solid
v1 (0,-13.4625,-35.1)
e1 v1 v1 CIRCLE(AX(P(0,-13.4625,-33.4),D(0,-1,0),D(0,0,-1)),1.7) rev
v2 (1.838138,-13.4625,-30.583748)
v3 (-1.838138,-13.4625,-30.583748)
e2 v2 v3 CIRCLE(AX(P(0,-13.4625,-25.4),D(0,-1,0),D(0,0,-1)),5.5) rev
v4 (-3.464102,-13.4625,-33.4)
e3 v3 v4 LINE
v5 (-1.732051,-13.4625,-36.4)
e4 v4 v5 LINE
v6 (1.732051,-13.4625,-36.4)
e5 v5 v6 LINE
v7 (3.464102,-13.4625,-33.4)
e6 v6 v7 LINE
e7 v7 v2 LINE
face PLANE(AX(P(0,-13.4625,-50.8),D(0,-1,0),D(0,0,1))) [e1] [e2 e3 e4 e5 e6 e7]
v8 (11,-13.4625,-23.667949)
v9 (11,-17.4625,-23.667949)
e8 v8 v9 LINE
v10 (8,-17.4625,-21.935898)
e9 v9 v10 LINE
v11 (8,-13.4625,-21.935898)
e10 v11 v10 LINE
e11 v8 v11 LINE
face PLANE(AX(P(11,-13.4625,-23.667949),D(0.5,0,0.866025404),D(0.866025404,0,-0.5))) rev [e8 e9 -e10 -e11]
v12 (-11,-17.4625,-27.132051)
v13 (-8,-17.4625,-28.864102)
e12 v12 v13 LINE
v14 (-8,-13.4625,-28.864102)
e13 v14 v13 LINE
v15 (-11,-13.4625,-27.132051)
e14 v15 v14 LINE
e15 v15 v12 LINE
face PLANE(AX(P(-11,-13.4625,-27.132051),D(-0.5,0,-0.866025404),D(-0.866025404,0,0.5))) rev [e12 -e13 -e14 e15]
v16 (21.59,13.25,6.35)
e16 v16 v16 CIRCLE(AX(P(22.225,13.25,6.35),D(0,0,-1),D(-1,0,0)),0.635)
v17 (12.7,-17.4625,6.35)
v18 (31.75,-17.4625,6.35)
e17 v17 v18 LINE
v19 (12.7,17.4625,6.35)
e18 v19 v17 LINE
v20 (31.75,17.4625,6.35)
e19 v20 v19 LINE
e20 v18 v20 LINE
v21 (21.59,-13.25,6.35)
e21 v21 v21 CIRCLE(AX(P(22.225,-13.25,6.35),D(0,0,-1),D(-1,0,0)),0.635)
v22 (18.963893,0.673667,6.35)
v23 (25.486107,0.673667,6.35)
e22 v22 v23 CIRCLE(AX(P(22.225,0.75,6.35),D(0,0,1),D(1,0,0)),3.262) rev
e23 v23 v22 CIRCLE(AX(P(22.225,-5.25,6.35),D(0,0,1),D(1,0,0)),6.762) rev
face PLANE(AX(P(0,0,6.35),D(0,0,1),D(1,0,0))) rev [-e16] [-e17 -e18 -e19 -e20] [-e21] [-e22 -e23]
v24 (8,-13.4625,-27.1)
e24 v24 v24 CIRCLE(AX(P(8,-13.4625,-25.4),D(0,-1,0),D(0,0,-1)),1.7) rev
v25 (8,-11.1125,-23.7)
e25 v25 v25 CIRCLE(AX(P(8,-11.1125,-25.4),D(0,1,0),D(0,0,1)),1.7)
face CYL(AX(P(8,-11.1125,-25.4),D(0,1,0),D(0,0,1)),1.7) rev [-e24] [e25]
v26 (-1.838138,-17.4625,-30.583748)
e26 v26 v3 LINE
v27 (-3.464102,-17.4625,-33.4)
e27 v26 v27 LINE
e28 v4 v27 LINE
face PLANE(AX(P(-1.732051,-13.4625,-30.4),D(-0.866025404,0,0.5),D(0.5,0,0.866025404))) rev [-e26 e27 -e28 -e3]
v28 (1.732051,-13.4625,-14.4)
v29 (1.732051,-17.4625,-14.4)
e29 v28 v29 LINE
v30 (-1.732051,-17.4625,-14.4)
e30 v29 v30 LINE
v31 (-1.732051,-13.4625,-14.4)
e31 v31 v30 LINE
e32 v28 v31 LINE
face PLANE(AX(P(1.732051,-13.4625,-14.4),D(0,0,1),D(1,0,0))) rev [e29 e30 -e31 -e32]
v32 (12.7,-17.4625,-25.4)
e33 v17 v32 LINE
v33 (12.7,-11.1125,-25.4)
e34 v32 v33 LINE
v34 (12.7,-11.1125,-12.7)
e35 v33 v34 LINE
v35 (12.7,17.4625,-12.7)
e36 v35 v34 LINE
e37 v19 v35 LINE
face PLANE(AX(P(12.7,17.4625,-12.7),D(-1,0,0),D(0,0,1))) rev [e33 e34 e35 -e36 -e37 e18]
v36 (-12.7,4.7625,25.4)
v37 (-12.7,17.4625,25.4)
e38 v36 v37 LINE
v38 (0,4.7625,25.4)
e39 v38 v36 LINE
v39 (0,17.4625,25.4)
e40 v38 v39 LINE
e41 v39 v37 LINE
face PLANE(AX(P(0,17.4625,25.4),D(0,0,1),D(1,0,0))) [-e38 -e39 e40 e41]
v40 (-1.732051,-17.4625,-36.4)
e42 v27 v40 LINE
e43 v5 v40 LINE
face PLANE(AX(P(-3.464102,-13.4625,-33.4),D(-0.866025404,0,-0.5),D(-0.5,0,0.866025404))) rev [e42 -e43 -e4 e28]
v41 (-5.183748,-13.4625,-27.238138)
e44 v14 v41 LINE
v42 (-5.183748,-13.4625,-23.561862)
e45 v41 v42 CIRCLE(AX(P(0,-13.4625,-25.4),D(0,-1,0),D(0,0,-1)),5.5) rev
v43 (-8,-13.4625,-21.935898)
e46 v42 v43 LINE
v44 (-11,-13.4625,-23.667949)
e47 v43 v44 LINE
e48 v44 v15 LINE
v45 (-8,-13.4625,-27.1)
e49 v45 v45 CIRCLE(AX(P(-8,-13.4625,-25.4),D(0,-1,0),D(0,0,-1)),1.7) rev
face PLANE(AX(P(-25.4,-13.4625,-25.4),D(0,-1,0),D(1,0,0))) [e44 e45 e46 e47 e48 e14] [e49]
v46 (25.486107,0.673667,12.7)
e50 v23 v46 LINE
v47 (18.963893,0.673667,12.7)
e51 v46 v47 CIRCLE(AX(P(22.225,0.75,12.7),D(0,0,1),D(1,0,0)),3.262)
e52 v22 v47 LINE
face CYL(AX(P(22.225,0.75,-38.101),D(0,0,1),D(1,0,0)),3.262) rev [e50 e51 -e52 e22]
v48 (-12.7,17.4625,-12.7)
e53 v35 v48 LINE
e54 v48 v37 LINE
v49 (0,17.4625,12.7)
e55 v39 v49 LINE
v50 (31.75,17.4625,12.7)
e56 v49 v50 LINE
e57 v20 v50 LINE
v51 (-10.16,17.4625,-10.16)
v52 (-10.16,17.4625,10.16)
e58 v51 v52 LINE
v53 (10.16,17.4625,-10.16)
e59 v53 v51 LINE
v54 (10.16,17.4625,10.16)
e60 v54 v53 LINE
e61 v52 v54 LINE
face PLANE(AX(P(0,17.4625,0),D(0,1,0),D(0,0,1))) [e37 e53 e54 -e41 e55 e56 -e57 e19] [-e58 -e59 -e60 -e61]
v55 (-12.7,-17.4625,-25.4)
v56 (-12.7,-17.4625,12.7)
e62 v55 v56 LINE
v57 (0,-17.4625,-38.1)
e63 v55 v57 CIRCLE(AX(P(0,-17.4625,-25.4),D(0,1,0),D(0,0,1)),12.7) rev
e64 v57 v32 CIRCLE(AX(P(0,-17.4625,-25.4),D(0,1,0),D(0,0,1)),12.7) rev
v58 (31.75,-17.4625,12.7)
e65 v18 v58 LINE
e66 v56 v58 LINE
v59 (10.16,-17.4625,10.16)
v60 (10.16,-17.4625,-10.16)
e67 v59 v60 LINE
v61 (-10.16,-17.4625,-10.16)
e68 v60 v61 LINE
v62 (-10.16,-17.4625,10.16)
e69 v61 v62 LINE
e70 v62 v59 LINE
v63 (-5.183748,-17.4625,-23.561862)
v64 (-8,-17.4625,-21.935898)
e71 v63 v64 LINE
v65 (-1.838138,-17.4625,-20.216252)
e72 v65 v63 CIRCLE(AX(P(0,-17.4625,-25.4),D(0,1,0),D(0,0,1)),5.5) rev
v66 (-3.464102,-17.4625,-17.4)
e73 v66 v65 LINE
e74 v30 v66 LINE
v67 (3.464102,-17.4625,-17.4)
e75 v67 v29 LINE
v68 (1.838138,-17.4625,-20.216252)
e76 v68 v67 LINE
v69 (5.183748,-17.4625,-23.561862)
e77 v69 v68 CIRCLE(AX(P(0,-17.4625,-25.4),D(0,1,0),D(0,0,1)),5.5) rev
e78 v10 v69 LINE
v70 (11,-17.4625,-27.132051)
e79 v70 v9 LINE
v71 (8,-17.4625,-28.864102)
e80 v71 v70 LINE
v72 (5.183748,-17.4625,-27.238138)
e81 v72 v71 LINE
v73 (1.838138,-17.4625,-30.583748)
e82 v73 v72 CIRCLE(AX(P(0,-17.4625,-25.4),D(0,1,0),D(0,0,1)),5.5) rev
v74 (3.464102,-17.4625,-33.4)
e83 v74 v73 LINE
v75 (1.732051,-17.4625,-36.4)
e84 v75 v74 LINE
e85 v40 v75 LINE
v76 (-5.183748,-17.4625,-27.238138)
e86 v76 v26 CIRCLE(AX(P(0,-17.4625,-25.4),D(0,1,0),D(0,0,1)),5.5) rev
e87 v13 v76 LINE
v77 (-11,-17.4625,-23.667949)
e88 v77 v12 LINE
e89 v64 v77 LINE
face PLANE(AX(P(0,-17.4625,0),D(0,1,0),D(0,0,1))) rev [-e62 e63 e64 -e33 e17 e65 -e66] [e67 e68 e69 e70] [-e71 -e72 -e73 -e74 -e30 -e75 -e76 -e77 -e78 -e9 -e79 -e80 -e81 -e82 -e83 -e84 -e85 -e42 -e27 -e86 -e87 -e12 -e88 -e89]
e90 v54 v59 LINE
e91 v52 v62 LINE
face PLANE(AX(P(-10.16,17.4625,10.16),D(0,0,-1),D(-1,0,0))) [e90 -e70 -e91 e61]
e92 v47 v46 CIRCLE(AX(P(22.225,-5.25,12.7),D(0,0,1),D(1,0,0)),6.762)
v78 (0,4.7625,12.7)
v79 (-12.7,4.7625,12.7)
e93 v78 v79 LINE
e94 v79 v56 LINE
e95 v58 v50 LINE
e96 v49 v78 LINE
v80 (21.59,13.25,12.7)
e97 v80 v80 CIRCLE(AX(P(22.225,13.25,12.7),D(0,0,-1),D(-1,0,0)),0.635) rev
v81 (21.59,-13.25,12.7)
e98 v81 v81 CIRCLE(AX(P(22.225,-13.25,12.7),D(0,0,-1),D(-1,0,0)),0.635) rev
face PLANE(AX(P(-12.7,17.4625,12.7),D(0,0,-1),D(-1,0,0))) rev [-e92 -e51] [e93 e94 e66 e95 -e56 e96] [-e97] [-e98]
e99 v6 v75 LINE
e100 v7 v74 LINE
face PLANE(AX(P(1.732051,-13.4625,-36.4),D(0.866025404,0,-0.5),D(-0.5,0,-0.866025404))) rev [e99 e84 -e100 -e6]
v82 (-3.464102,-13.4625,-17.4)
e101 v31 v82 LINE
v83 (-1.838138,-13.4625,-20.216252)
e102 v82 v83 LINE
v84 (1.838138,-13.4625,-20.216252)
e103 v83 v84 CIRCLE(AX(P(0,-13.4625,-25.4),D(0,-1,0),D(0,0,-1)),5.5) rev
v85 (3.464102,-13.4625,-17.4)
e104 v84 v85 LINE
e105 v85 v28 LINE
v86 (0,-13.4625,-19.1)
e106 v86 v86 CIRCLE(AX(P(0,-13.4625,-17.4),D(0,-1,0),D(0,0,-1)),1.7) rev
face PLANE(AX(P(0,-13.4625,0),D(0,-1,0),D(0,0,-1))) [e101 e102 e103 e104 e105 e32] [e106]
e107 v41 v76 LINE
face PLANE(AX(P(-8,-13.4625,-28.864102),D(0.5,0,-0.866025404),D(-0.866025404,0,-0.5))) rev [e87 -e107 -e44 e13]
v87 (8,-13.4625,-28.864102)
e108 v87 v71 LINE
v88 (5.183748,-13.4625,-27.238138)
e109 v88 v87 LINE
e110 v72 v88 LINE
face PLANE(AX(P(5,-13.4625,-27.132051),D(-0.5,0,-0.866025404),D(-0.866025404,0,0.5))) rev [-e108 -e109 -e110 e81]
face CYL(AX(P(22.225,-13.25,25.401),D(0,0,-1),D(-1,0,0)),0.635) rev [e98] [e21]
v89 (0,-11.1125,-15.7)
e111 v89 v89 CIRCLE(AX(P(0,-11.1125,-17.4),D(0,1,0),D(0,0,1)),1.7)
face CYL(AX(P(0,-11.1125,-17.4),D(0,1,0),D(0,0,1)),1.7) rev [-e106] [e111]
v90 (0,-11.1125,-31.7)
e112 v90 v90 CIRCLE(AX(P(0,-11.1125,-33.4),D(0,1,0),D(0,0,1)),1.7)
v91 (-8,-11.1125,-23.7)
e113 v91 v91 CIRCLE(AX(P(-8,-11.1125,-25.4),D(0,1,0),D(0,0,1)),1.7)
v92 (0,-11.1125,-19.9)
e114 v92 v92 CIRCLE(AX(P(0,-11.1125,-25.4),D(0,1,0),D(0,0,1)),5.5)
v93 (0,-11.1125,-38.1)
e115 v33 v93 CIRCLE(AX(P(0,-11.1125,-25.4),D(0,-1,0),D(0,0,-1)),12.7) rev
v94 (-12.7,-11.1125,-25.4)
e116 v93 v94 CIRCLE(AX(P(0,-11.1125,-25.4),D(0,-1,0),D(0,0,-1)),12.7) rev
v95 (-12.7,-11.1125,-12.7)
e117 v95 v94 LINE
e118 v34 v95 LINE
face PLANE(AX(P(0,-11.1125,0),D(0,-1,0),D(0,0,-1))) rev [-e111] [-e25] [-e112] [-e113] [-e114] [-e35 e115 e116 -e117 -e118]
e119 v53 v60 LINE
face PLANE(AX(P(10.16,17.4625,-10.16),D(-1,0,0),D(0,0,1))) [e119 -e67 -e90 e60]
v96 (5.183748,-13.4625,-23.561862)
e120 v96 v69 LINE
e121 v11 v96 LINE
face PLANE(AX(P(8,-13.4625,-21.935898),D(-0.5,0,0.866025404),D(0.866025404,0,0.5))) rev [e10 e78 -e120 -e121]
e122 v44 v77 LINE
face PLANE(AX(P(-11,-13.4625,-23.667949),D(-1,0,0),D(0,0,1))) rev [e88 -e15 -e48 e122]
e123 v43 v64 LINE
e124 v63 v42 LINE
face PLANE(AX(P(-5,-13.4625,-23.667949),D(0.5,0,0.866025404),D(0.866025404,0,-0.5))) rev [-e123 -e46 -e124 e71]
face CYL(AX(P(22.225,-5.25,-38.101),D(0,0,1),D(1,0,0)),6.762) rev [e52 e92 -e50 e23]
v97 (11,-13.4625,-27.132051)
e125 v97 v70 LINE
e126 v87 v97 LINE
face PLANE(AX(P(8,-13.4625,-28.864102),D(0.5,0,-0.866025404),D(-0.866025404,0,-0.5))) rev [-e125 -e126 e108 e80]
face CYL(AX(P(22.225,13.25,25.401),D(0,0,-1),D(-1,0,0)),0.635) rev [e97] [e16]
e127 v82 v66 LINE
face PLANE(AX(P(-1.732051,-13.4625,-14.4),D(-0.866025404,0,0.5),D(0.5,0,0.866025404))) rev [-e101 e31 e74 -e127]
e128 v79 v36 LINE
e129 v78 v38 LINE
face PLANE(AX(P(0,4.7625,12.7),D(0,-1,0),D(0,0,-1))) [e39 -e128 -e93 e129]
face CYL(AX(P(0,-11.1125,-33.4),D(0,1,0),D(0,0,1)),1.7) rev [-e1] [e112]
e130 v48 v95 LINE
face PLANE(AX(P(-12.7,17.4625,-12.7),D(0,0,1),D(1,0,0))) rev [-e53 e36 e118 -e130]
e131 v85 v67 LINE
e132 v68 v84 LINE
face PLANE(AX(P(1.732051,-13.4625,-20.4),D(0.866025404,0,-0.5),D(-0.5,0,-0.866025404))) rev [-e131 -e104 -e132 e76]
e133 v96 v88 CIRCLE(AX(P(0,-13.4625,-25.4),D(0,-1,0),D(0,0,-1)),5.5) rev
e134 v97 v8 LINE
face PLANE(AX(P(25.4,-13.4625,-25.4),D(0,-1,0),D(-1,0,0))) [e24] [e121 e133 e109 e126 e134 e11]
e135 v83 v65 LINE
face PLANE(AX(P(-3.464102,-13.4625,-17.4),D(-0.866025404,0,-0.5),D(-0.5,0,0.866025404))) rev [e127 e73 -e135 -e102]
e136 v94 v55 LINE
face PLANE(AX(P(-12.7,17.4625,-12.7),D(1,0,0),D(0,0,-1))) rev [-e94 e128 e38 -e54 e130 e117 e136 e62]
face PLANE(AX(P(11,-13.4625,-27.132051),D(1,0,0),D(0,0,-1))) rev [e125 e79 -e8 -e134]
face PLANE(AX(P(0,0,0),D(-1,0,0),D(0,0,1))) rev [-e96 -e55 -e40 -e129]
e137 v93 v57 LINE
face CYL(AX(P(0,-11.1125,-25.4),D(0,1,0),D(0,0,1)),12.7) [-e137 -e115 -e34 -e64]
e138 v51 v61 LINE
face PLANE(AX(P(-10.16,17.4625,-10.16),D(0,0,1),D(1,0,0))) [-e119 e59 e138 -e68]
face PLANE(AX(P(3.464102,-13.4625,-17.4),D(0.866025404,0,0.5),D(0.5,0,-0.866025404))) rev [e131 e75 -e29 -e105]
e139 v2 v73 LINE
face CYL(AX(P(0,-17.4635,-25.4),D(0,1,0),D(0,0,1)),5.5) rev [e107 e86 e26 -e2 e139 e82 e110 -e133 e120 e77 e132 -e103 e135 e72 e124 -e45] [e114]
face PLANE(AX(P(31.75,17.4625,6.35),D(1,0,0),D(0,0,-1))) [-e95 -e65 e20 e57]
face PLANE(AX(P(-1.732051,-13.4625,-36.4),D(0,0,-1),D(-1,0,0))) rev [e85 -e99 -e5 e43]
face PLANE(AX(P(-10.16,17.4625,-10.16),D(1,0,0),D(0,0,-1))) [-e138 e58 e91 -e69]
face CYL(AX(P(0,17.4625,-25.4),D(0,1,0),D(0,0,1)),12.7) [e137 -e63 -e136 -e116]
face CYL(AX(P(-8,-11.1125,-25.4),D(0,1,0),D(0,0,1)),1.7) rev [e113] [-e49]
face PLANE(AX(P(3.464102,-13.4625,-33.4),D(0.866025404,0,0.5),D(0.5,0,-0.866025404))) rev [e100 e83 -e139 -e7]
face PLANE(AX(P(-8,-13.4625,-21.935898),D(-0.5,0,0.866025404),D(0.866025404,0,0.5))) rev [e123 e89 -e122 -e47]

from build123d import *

# Parameters (mm, degrees)
SKETCH1_W            = 25.4
SKETCH1_H            = 25.4
SKETCH1_W_2          = 20.32
SKETCH1_H_2          = 20.32
BOSS_EXTRUDE1_DEPTH  = 17.4625
SKETCH4_W            = 25.4
SKETCH4_H            = 25.4
BOSS_EXTRUDE2_DEPTH  = 6.35
CUT_EXTRUDE1_REACH   = 51.289
SKETCH6_R            = 5.5
FILLET1_R            = 12.7
M3_CLEARANCE_HOLE1_D = 3.4
CIRPATTERN1_COUNT    = 4
CUT_EXTRUDE2_DEPTH   = 4
CIRPATTERN2_COUNT    = 4
SKETCH12_W           = 19.05
SKETCH12_H           = 34.925
BOSS_EXTRUDE3_DEPTH  = 6.35
SKETCH13_W           = 12.7
SKETCH13_H           = 12.7
BOSS_EXTRUDE4_DEPTH  = 12.7
CUT_EXTRUDE3_REACH   = 59.348
SKETCH15_R           = 0.635
CUT_EXTRUDE4_REACH   = 64.399


with BuildPart() as part:
    # Sketch1 → Boss-Extrude1 (new, symmetric)
    with BuildSketch(Plane(origin=(0, 0, 0), x_dir=(1, 0, 0), z_dir=(0, 1, 0))):
        Rectangle(SKETCH1_W, SKETCH1_H)
        Rectangle(SKETCH1_W_2, SKETCH1_H_2, mode=Mode.SUBTRACT)
    extrude(amount=BOSS_EXTRUDE1_DEPTH, both=True)

    # Sketch4 → Boss-Extrude2 (add)
    with BuildSketch(Plane.XZ.offset(17.4625)):
        with Locations((0, -25.4)):
            Rectangle(SKETCH4_W, SKETCH4_H)
    extrude(amount=-BOSS_EXTRUDE2_DEPTH)

    # Sketch6 → Cut-Extrude1 (cut, up to next)
    with BuildSketch(Plane(origin=(0, -11.1125, 0), x_dir=(1, 0, 0), z_dir=(0, 1, 0)), mode=Mode.PRIVATE) as cut_extrude1_sk1:
        with Locations(Location((0, 25.4, 0), (0, 0, 270))):
            Circle(SKETCH6_R)
    cut_extrude1_tool1 = extrude(cut_extrude1_sk1.sketch, amount=-CUT_EXTRUDE1_REACH, mode=Mode.PRIVATE) & part.part
    add(cut_extrude1_tool1.solids().sort_by_distance((0, -11.1125, -25.4))[0], mode=Mode.SUBTRACT)

    # Fillet1
    fillet1_edges = [part.edges().sort_by_distance(p)[0] for p in [
        (-12.7, -14.2875, -38.1),
        (12.7, -14.2875, -38.1),
    ]]
    fillet(fillet1_edges, radius=FILLET1_R - 0.0001)  # a hair under: the kernel refuses the full size

    # M3 Clearance Hole1 (through all)
    with Locations(Plane(origin=(0, -11.1125, 0), x_dir=(1, 0, 0), z_dir=(0, 1, 0))):
        with Locations((0, 33.4)):
            m3_clearance_hole1 = Hole(M3_CLEARANCE_HOLE1_D / 2)

    # CirPattern1: M3 Clearance Hole1 ×4 about axis
    cirpattern1_axis = Axis((0, 0, -25.4), (0, 1, 0))
    for i in range(1, CIRPATTERN1_COUNT):
        add(m3_clearance_hole1.rotate(cirpattern1_axis, i * 360 / CIRPATTERN1_COUNT), mode=Mode.SUBTRACT)

    # Sketch11 → Cut-Extrude2 (cut)
    with BuildSketch(Plane.XZ.offset(17.4625)):
        Polygon((1.732050808, -14.4), (-1.732050808, -14.4), (-3.464101615, -17.4), (-1.732050808, -20.4), (1.732050808, -20.4), (3.464101615, -17.4), align=None)
    cut_extrude2 = extrude(amount=-CUT_EXTRUDE2_DEPTH, mode=Mode.SUBTRACT)

    # CirPattern2: Cut-Extrude2 ×4 about axis
    cirpattern2_axis = Axis((0, 0, -25.4), (0, 1, 0))
    for i in range(1, CIRPATTERN2_COUNT):
        add(cut_extrude2.rotate(cirpattern2_axis, i * 360 / CIRPATTERN2_COUNT), mode=Mode.SUBTRACT)

    # Sketch12 → Boss-Extrude3 (add)
    with BuildSketch(Plane.XY.offset(12.7)):
        with Locations((22.225, 0)):
            Rectangle(SKETCH12_W, SKETCH12_H)
    extrude(amount=-BOSS_EXTRUDE3_DEPTH)

    # Sketch13 → Boss-Extrude4 (add)
    with BuildSketch(Plane.ZY.offset(12.7)):
        with Locations((19.05, 11.1125)):
            Rectangle(SKETCH13_W, SKETCH13_H)
    extrude(amount=-BOSS_EXTRUDE4_DEPTH)

    # Sketch15 → Cut-Extrude3 (cut, up to next)
    with BuildSketch(Plane(origin=(0, 0, 6.35), x_dir=(-1, 0, 0), z_dir=(0, 0, -1)), mode=Mode.PRIVATE) as cut_extrude3_sk1:
        with Locations((-22.225, 13.25)):
            Circle(SKETCH15_R)
    cut_extrude3_tool1 = extrude(cut_extrude3_sk1.sketch, amount=-CUT_EXTRUDE3_REACH, mode=Mode.PRIVATE) & part.part
    # Sketch15 → Cut-Extrude3 (cut, up to next)
    with BuildSketch(Plane(origin=(0, 0, 6.35), x_dir=(-1, 0, 0), z_dir=(0, 0, -1)), mode=Mode.PRIVATE) as cut_extrude3_sk2:
        with Locations((-22.225, -13.25)):
            Circle(SKETCH15_R)
    cut_extrude3_tool2 = extrude(cut_extrude3_sk2.sketch, amount=-CUT_EXTRUDE3_REACH, mode=Mode.PRIVATE) & part.part
    add(cut_extrude3_tool1.solids().sort_by_distance((22.225, 13.25, 6.35))[0], mode=Mode.SUBTRACT)
    add(cut_extrude3_tool2.solids().sort_by_distance((22.225, -13.25, 6.35))[0], mode=Mode.SUBTRACT)

    # Sketch16 → Cut-Extrude4 (cut, up to next)
    with BuildSketch(Plane.XY.offset(12.7), mode=Mode.PRIVATE) as cut_extrude4_sk1:
        with BuildLine():
            ThreePointArc((18.963893252, 0.673666667), (22.225, -12.012), (25.486106748, 0.673666667))
            ThreePointArc((25.486106748, 0.673666667), (22.225, 4.012), (18.963893252, 0.673666667))
        make_face()
    cut_extrude4_tool1 = extrude(cut_extrude4_sk1.sketch, amount=-CUT_EXTRUDE4_REACH, mode=Mode.PRIVATE) & part.part
    add(cut_extrude4_tool1.solids().sort_by_distance((22.225, -4.592909, 12.7))[0], mode=Mode.SUBTRACT)


solid = part.part
